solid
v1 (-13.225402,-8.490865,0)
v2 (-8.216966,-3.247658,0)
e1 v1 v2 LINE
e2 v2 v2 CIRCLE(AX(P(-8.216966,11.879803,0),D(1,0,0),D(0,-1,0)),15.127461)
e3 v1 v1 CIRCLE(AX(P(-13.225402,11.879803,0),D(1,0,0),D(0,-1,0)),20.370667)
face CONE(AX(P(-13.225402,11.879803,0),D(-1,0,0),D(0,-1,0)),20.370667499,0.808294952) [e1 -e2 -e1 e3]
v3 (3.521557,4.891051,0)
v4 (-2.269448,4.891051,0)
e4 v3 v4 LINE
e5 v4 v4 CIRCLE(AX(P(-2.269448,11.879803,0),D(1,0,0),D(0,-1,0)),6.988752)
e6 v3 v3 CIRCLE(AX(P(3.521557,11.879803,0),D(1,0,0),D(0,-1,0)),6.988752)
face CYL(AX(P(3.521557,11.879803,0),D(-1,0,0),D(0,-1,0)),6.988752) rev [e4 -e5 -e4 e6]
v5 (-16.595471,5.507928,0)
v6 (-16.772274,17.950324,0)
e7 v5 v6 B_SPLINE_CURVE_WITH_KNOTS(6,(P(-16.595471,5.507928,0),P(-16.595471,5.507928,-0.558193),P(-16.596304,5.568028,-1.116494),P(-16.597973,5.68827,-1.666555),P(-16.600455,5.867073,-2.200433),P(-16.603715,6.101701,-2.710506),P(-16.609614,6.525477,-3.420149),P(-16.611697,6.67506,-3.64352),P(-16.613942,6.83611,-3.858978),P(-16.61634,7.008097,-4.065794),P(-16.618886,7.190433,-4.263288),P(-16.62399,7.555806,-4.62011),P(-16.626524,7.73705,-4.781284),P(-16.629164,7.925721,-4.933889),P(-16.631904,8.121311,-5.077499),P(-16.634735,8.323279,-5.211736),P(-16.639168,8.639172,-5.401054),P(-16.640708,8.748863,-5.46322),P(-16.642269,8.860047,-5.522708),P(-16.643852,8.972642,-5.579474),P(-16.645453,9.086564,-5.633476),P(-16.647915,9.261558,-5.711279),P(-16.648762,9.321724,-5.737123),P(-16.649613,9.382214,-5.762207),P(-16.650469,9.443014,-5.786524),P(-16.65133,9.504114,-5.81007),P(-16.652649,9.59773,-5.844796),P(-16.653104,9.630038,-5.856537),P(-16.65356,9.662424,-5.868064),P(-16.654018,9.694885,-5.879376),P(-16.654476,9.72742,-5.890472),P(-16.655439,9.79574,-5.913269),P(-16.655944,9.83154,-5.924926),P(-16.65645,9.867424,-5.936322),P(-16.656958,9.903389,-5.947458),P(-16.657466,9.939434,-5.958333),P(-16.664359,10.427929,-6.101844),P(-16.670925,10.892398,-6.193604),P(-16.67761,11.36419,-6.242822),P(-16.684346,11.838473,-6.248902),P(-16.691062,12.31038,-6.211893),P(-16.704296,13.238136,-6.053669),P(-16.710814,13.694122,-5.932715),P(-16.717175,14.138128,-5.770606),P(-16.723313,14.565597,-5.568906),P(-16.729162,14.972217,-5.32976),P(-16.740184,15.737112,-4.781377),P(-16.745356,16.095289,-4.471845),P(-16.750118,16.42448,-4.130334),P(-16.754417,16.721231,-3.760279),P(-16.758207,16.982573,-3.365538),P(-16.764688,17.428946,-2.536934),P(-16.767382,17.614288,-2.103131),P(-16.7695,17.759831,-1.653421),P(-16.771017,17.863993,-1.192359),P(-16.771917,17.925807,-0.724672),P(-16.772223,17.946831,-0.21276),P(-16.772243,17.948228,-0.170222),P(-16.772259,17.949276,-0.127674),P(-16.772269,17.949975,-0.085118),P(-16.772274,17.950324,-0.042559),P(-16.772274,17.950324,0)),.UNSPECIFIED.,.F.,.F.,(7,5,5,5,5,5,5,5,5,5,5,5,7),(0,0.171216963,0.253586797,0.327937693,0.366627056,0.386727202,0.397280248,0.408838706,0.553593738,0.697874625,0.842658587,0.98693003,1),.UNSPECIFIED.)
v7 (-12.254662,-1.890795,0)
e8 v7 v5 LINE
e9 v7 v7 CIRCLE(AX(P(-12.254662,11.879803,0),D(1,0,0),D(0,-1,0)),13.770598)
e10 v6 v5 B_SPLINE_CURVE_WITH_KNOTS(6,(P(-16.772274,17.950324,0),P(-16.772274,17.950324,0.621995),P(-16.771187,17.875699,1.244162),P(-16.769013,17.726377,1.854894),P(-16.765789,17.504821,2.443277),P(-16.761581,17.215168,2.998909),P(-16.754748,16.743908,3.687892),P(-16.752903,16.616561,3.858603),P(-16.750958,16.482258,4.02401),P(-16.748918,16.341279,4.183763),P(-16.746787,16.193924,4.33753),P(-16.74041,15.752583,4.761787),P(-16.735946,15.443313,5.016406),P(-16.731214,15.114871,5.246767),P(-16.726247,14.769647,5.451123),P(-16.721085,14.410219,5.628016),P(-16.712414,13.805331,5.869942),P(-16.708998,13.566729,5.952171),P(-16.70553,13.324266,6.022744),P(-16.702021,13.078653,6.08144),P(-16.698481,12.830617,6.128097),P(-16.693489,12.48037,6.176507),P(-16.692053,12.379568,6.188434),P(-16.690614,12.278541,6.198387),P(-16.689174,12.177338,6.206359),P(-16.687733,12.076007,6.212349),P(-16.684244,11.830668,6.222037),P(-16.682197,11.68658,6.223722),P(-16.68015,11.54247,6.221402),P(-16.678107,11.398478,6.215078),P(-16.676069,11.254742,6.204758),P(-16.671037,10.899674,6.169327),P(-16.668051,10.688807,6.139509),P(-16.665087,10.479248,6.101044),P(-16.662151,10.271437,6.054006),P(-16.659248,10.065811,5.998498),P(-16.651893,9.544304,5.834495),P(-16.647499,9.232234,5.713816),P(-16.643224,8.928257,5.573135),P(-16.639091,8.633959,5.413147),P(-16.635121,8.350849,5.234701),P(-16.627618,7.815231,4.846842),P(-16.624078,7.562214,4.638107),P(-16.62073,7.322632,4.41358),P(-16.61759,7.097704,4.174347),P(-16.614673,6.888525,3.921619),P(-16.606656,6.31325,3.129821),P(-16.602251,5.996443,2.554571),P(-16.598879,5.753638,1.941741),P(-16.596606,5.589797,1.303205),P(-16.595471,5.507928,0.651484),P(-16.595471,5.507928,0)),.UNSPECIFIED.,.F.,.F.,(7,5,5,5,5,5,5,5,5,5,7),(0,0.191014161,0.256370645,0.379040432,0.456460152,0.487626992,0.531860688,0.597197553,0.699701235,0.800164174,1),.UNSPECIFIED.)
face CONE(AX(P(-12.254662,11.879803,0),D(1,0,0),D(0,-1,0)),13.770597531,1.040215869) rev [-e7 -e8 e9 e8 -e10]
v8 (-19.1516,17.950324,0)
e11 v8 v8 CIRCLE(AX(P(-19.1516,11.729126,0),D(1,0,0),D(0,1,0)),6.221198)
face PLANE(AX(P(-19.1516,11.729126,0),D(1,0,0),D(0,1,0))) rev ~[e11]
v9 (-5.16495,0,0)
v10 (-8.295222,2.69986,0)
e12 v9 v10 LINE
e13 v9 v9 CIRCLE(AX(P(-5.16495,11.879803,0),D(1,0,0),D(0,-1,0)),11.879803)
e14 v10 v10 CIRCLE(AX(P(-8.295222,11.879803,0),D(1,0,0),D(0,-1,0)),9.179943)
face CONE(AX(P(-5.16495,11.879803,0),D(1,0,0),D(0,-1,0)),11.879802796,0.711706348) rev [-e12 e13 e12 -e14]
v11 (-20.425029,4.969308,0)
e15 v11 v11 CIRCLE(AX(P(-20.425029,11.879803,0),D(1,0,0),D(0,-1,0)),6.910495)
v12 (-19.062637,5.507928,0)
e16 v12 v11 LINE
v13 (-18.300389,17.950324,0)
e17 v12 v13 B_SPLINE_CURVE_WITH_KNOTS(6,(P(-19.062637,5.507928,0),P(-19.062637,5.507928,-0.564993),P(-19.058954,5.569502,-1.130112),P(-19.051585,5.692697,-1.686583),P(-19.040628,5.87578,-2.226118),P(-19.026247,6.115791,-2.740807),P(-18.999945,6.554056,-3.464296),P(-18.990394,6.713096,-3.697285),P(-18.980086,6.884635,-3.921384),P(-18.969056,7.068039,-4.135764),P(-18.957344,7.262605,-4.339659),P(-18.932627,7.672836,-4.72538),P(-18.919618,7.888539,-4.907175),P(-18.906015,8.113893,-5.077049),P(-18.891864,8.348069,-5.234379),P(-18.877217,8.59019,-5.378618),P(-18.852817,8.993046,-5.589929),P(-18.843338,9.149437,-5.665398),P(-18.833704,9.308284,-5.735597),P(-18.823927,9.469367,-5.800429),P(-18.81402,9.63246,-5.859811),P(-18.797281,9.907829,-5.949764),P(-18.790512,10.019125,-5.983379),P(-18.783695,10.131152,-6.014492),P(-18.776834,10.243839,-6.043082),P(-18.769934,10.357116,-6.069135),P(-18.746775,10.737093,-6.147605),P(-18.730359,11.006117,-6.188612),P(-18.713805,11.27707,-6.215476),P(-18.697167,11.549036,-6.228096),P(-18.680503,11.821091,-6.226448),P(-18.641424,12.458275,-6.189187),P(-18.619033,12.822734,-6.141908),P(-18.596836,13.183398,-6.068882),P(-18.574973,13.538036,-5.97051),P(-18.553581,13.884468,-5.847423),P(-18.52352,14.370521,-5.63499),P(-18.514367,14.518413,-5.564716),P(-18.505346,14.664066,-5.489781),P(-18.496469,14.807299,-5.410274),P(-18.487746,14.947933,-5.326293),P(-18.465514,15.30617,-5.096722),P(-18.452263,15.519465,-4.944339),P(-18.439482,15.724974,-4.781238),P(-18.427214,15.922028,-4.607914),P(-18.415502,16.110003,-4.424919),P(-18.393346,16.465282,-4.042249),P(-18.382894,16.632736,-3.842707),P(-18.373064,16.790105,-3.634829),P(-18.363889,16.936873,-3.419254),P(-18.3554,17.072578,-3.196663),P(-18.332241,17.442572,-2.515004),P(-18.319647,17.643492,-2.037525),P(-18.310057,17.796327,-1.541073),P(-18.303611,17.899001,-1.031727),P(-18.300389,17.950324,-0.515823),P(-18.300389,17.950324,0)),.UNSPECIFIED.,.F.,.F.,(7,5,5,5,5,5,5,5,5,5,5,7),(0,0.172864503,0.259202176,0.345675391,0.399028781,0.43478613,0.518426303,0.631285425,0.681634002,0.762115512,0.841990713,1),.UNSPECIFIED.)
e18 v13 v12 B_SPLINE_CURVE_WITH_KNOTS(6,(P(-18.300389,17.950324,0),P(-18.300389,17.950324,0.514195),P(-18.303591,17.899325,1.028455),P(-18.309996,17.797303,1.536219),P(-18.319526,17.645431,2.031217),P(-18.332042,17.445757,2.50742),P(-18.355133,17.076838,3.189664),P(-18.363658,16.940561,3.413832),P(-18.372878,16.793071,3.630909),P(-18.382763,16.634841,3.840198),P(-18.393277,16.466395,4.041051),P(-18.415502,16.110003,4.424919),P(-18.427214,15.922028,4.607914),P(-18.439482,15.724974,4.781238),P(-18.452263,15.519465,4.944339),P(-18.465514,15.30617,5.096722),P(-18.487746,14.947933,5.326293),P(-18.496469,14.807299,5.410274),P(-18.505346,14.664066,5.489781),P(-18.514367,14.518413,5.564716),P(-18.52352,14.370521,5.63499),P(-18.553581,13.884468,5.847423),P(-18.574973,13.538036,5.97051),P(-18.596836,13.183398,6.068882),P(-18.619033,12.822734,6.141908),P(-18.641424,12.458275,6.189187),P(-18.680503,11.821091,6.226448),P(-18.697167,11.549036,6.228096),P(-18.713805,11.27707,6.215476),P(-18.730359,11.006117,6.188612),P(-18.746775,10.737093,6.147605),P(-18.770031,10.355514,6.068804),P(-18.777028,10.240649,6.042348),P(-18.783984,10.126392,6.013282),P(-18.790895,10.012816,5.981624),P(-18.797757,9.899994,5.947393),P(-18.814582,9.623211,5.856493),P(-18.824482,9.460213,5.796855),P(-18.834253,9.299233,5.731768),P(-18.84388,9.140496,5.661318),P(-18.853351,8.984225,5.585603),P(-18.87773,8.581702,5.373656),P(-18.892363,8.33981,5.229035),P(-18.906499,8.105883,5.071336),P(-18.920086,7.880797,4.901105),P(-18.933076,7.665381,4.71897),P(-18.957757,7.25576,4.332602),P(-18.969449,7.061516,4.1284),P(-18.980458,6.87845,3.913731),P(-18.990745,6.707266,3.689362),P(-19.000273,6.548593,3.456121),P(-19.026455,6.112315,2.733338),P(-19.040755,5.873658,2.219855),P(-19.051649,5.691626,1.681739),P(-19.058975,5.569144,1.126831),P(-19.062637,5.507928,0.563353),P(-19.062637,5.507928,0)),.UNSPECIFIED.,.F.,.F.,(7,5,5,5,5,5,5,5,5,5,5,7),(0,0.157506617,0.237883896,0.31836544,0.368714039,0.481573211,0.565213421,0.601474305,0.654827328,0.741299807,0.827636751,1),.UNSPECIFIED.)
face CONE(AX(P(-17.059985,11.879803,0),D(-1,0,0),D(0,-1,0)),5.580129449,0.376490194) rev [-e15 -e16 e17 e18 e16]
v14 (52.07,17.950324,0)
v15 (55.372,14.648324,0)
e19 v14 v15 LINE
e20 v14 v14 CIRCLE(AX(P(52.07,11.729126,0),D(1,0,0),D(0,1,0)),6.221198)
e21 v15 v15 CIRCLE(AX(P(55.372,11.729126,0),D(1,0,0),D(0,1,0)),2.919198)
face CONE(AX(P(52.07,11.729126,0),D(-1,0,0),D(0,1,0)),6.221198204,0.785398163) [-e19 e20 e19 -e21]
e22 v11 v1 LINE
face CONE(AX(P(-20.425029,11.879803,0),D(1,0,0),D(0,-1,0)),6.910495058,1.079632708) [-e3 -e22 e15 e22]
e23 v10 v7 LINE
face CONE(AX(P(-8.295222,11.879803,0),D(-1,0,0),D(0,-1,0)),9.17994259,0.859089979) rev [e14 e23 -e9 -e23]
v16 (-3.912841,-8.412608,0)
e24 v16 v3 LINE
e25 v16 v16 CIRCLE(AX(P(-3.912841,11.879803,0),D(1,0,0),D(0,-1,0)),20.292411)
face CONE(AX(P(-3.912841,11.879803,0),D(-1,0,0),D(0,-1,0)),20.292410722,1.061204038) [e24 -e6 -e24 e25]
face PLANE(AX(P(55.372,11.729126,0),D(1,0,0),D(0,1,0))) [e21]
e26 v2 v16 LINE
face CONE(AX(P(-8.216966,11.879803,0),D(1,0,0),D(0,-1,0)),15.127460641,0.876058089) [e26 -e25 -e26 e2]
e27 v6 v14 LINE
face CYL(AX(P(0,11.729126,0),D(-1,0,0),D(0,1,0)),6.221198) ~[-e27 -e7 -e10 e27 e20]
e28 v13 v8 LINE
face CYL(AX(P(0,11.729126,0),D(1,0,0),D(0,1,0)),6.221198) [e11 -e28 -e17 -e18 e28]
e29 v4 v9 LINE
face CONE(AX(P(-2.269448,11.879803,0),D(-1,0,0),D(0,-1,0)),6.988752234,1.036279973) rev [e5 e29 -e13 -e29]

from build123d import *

# Parameters (mm, degrees)
F2_R     = 6.2211982037
F3_DEPTH = 19.1516
F4_DEPTH = 55.372
F5_SIZE  = 3.302


# Not quite as in the source:
# - the program builds the solid bodies; features that only make, move or delete a surface that nothing else refers to are left out


with BuildPart() as f1:
    # F0 (on Top) → F1 (revolve)
    with BuildSketch(Plane.XY):
        Polygon((-17.0599853833, 6.2996733477), (-20.4250291926, 4.9693077386), (-13.2254017106, -8.4908647026), (-8.2169655835, -3.2476578449), (-3.9128408491, -8.4126079255), (3.521556964, 4.8910505621), (-2.2694479322, 4.8910505621), (-5.1649496812, 0), (-8.2952223605, 2.6998602059), (-12.2546622766, -1.8907947353), align=None)
    revolve(axis=Axis((-9.930120464, 11.8798027962, 0), (1, 0, 0)))

    # F2 (on Right) → F3 (join)
    with BuildSketch(Plane.YZ):
        with Locations((11.7291258648, 0)):
            Circle(F2_R)
    extrude(amount=-F3_DEPTH)

    # F4 (add): a face of the model
    f4_faces = [f1.faces().sort_by_distance(p)[0] for p in [
        (0, 11.7291258648, 0),
    ]]
    extrude(f4_faces, amount=F4_DEPTH)

    # F5
    f5_edges = [f1.edges().sort_by_distance(p)[0] for p in [
        (55.372, 5.507928, 0),
    ]]
    chamfer(f5_edges, length=F5_SIZE)


solid = f1.part
